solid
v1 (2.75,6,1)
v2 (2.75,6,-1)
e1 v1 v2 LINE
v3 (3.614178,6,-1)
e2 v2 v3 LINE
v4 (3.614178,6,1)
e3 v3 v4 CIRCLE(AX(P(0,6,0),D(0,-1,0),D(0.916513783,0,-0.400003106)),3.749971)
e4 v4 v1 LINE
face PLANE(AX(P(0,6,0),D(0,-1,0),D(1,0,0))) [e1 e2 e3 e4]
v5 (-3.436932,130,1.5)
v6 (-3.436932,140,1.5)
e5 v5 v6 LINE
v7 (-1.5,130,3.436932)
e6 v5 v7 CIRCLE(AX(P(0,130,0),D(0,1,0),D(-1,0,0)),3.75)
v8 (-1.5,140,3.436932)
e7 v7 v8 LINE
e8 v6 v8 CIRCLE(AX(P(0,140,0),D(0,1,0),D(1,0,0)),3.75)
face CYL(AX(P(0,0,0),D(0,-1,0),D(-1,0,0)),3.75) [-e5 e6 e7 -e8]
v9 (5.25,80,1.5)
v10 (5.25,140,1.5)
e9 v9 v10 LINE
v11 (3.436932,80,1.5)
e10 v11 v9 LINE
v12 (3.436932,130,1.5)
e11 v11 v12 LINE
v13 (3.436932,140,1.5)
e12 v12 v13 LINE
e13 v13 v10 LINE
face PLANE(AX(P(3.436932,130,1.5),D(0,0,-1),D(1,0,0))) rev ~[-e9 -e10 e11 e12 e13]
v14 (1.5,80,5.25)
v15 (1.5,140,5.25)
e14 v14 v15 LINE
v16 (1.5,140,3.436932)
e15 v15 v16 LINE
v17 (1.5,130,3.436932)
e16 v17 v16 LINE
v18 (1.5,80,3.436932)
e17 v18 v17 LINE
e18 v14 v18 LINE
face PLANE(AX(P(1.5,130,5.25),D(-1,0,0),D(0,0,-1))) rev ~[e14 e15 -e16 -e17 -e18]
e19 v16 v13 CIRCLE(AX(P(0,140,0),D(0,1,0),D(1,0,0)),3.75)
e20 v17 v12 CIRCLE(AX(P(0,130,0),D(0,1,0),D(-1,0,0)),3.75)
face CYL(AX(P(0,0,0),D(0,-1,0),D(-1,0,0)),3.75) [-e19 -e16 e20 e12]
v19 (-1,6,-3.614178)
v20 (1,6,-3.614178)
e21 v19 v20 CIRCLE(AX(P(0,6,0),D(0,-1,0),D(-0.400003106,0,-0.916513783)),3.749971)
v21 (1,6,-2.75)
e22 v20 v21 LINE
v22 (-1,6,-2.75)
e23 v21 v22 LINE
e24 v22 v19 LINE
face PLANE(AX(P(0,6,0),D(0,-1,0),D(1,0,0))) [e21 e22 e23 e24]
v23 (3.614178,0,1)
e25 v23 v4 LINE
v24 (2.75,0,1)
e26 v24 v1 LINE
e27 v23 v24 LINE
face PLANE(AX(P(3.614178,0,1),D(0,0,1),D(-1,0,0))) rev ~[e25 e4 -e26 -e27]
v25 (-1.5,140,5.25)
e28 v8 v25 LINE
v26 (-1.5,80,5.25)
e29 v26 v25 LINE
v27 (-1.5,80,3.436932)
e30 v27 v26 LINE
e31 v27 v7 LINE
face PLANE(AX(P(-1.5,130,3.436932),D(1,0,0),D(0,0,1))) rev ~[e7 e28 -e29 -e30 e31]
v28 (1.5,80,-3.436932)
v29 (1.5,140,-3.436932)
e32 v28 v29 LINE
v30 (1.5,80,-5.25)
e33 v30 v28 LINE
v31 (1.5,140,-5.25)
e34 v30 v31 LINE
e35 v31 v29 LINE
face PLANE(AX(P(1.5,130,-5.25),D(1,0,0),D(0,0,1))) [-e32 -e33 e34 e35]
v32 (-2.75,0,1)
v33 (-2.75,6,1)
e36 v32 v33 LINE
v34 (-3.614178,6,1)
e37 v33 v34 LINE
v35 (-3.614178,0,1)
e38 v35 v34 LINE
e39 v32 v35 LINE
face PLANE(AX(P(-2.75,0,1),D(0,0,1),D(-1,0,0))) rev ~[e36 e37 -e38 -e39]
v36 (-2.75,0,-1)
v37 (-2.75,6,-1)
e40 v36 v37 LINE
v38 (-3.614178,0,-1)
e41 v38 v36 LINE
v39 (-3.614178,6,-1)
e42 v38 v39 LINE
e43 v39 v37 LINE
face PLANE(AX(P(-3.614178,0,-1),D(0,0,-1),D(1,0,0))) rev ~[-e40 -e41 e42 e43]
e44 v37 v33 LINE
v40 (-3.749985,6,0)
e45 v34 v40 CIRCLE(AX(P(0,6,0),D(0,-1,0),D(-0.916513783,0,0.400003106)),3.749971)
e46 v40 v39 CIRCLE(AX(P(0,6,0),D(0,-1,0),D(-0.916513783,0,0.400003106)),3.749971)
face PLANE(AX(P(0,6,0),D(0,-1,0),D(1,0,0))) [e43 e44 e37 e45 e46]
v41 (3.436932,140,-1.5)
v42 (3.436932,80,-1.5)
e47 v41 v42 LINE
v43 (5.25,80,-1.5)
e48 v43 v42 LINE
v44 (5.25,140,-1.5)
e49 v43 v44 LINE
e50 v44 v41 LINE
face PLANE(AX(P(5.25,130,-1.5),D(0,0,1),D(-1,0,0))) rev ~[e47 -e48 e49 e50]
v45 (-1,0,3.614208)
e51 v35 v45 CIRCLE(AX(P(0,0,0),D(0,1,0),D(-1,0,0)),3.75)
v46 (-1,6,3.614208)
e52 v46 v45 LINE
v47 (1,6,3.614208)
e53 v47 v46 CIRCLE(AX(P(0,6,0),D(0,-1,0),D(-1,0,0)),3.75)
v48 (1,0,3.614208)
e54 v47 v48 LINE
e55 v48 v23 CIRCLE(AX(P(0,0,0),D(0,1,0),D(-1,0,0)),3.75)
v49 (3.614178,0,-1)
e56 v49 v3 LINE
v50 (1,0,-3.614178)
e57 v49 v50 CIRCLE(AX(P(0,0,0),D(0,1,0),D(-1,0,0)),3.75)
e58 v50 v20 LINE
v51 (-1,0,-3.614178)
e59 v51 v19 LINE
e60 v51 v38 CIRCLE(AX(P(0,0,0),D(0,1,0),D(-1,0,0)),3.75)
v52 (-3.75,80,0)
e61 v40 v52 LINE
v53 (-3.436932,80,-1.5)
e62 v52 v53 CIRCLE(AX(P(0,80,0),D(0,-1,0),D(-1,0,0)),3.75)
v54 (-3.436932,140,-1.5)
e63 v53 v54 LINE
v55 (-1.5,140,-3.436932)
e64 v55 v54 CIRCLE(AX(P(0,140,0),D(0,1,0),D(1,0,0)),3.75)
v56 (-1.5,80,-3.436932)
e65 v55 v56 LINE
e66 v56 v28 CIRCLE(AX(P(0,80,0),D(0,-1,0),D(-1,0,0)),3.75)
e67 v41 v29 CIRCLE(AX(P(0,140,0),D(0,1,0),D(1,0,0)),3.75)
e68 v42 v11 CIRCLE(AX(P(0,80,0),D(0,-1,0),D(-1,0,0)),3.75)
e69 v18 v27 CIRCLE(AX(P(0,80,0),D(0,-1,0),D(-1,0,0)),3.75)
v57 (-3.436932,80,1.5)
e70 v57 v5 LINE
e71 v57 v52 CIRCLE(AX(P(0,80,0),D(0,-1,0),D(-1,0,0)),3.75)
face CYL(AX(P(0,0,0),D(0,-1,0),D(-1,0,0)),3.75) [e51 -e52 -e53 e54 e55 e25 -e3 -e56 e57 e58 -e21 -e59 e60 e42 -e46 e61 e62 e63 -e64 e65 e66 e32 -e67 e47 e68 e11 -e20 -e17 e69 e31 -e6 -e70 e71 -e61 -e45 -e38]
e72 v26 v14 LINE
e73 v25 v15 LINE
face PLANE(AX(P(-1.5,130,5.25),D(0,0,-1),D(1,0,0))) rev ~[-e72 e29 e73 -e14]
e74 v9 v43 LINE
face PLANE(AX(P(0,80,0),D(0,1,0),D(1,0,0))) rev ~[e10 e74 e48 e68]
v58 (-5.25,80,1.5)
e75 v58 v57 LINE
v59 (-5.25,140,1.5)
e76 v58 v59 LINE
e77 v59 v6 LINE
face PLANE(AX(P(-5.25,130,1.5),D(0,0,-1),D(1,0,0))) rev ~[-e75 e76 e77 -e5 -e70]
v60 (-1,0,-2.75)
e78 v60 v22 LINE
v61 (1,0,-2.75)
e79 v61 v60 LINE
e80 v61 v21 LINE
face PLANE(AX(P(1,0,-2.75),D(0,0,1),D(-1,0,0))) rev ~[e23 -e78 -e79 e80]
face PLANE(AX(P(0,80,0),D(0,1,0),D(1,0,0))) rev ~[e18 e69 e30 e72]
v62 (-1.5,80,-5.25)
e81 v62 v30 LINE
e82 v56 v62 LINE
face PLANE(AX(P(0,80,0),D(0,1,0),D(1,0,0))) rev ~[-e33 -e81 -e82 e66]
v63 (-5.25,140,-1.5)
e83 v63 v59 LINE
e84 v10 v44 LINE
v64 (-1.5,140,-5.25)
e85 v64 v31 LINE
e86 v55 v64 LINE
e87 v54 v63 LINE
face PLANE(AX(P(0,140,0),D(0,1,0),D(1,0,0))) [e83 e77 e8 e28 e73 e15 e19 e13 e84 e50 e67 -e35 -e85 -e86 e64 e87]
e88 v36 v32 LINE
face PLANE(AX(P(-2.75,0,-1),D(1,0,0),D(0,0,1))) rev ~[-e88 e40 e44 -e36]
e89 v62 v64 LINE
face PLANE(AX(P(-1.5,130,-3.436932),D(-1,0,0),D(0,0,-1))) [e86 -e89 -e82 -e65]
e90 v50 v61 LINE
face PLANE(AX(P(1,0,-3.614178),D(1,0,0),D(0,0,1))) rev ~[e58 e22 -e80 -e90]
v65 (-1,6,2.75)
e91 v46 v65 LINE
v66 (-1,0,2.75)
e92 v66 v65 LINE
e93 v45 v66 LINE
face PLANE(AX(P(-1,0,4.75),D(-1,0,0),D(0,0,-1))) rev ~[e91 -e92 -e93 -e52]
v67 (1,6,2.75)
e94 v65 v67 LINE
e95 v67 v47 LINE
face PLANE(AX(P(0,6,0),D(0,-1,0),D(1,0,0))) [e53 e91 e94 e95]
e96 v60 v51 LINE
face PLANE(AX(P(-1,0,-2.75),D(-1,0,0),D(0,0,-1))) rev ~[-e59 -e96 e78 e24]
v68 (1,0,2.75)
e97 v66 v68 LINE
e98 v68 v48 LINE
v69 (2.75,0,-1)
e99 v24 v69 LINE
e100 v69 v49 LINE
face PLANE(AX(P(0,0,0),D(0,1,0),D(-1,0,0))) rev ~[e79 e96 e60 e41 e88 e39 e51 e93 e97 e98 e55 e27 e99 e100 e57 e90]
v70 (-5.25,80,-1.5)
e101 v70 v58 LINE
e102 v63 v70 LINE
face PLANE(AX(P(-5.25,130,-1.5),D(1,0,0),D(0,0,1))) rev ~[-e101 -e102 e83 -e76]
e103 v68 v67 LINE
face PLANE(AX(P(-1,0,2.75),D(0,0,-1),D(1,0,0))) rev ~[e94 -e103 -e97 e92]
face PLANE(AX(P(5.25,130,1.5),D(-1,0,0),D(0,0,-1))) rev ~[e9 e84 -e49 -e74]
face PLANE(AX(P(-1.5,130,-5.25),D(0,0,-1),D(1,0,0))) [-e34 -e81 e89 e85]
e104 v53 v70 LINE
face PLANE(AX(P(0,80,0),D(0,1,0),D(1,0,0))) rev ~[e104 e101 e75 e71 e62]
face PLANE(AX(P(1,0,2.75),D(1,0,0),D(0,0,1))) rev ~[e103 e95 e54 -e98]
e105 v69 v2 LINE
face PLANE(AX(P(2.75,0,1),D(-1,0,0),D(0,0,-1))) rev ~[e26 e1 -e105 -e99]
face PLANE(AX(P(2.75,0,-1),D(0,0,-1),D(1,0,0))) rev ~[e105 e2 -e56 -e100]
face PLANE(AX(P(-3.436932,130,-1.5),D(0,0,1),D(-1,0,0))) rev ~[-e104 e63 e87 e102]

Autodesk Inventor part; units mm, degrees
ref_plane "YZ Plane" through (0, 0, 0) normal (1, 0, 0) x (0, 1, 0)
ref_plane "XZ Plane" through (0, 0, 0) normal (0, 1, 0) x (-1, 0, 0)
ref_plane "XY Plane" through (0, 0, 0) normal (0, 0, 1) x (1, 0, 0)
sketch "Sketch7" plane through (0, 0, 0) normal (0, 1, 0) x (-1, 0, 0)
  circle A0 centre (0, 0) radius 3.75
  dimension "d71" = 7.5
extrude "Extrusion7" add sketch "Sketch7" along normal blind 130
sketch "Sketch8" plane through (0, 130, 0) normal (0, 1, 0) x (1, 0, 0)
  line L0 (-5.25, -1.5) -> (-2.25, -1.5)
  line L1 (-2.25, -1.5) -> (-2.25, 1.5)
  line L2 (-2.25, 1.5) -> (-5.25, 1.5)
  line L3 (-5.25, 1.5) -> (-5.25, -1.5)
  circle A0 centre (0, 0) radius 3.75 projected
  line L4 (-5.25, -1.5) -> (-2.25, 1.5) construction
  line L5 (-2.25, -1.5) -> (-5.25, 1.5) construction
  line L6 (1.5, 2.25) -> (-1.5, 2.25)
  line L7 (-1.5, 2.25) -> (-1.5, 5.25)
  line L8 (-1.5, 5.25) -> (1.5, 5.25)
  line L9 (1.5, 5.25) -> (1.5, 2.25)
  line L10 (1.5, 2.25) -> (-1.5, 5.25) construction
  line L11 (-1.5, 2.25) -> (1.5, 5.25) construction
  line L12 (2.25, -1.5) -> (5.25, -1.5)
  line L13 (5.25, -1.5) -> (5.25, 1.5)
  line L14 (5.25, 1.5) -> (2.25, 1.5)
  line L15 (2.25, 1.5) -> (2.25, -1.5)
  line L16 (2.25, -1.5) -> (5.25, 1.5) construction
  line L17 (5.25, -1.5) -> (2.25, 1.5) construction
  line L18 (-1.5, -5.25) -> (1.5, -5.25)
  line L19 (1.5, -5.25) -> (1.5, -2.25)
  line L20 (1.5, -2.25) -> (-1.5, -2.25)
  line L21 (-1.5, -2.25) -> (-1.5, -5.25)
  line L22 (-1.5, -5.25) -> (1.5, -2.25) construction
  line L23 (1.5, -5.25) -> (-1.5, -2.25) construction
  point P0 (-3.75, 0)
  point P1 (0, 3.75)
  point P2 (3.75, 0)
  point P3 (0, -3.75)
  point P4 (3.4369, 1.5)
  point P5 (3.4369, -1.5)
  point P6 (-1.5, 3.4369)
  point P7 (1.5, 3.4369)
  point P8 (-3.4369, -1.5)
  point P9 (-3.4369, 1.5)
  point P10 (1.5, -3.4369)
  point P11 (-1.5, -3.4369)
  dimension "d74" = 3
  dimension "d75" = 3
  dimension "d76" = 3
  dimension "d77" = 3
  dimension "d78" = 3
  dimension "d79" = 3
  dimension "d80" = 3
  dimension "d81" = 3
extrude "Extrusion8" add sketch "Sketch8" along normal blind 10 and the other way blind 50
sketch "Sketch9" plane through (0, 0, 0) normal (0, -1, 0) x (1, 0, 0)
  line L0 (4.75, 1) -> (2.75, 1)
  line L1 (2.75, 1) -> (2.75, -1)
  line L2 (2.75, -1) -> (4.75, -1)
  line L3 (4.75, -1) -> (4.75, 1)
  arc A0 (3.4369, -1.5) -> (3.4369, 1.5) centre (0, 0) ccw projected
  line L4 (4.75, 1) -> (2.75, -1) construction
  line L5 (2.75, 1) -> (4.75, -1) construction
  line L6 (1, -2.75) -> (-1, -2.75)
  line L7 (-1, -2.75) -> (-1, -4.75)
  line L8 (-1, -4.75) -> (1, -4.75)
  line L9 (1, -4.75) -> (1, -2.75)
  arc A1 (-1.5, -3.4369) -> (1.5, -3.4369) centre (0, 0) ccw projected
  line L10 (1, -2.75) -> (-1, -4.75) construction
  line L11 (-1, -2.75) -> (1, -4.75) construction
  line L12 (-2.75, 1) -> (-4.75, 1)
  line L13 (-4.75, 1) -> (-4.75, -1)
  line L14 (-4.75, -1) -> (-2.75, -1)
  line L15 (-2.75, -1) -> (-2.75, 1)
  arc A2 (-3.4369, 1.5) -> (-3.4369, -1.5) centre (0, 0) ccw projected
  line L16 (-2.75, 1) -> (-4.75, -1) construction
  line L17 (-4.75, 1) -> (-2.75, -1) construction
  line L18 (1, 4.75) -> (-1, 4.75)
  line L19 (-1, 4.75) -> (-1, 2.75)
  line L20 (-1, 2.75) -> (1, 2.75)
  line L21 (1, 2.75) -> (1, 4.75)
  line L22 (1, 4.75) -> (-1, 2.75) construction
  line L23 (-1, 4.75) -> (1, 2.75) construction
  point P0 (3.75, 0)
  point P1 (0, -3.75)
  point P2 (-3.75, 0)
  point P3 (0, 3.75)
  point P4 (-3.6142, 1)
  point P5 (-3.6142, -1)
  point P6 (-1, -3.6142)
  point P7 (1, -3.6142)
  point P8 (3.6142, -1)
  point P9 (3.6142, 1)
  dimension "d86" = 2
  dimension "d87" = 2
  dimension "d88" = 2
  dimension "d89" = 2
  dimension "d90" = 2
  dimension "d91" = 2
  dimension "d92" = 2
  dimension "d93" = 2
extrude "Extrusion9" cut sketch "Sketch9" against normal blind 6 contours A0 L2 L1 L0 | L9 A1 L7 L6 | L15 L14 A2 L12 | L21 L20 L19 L18
properties part number "Lower Arm"
